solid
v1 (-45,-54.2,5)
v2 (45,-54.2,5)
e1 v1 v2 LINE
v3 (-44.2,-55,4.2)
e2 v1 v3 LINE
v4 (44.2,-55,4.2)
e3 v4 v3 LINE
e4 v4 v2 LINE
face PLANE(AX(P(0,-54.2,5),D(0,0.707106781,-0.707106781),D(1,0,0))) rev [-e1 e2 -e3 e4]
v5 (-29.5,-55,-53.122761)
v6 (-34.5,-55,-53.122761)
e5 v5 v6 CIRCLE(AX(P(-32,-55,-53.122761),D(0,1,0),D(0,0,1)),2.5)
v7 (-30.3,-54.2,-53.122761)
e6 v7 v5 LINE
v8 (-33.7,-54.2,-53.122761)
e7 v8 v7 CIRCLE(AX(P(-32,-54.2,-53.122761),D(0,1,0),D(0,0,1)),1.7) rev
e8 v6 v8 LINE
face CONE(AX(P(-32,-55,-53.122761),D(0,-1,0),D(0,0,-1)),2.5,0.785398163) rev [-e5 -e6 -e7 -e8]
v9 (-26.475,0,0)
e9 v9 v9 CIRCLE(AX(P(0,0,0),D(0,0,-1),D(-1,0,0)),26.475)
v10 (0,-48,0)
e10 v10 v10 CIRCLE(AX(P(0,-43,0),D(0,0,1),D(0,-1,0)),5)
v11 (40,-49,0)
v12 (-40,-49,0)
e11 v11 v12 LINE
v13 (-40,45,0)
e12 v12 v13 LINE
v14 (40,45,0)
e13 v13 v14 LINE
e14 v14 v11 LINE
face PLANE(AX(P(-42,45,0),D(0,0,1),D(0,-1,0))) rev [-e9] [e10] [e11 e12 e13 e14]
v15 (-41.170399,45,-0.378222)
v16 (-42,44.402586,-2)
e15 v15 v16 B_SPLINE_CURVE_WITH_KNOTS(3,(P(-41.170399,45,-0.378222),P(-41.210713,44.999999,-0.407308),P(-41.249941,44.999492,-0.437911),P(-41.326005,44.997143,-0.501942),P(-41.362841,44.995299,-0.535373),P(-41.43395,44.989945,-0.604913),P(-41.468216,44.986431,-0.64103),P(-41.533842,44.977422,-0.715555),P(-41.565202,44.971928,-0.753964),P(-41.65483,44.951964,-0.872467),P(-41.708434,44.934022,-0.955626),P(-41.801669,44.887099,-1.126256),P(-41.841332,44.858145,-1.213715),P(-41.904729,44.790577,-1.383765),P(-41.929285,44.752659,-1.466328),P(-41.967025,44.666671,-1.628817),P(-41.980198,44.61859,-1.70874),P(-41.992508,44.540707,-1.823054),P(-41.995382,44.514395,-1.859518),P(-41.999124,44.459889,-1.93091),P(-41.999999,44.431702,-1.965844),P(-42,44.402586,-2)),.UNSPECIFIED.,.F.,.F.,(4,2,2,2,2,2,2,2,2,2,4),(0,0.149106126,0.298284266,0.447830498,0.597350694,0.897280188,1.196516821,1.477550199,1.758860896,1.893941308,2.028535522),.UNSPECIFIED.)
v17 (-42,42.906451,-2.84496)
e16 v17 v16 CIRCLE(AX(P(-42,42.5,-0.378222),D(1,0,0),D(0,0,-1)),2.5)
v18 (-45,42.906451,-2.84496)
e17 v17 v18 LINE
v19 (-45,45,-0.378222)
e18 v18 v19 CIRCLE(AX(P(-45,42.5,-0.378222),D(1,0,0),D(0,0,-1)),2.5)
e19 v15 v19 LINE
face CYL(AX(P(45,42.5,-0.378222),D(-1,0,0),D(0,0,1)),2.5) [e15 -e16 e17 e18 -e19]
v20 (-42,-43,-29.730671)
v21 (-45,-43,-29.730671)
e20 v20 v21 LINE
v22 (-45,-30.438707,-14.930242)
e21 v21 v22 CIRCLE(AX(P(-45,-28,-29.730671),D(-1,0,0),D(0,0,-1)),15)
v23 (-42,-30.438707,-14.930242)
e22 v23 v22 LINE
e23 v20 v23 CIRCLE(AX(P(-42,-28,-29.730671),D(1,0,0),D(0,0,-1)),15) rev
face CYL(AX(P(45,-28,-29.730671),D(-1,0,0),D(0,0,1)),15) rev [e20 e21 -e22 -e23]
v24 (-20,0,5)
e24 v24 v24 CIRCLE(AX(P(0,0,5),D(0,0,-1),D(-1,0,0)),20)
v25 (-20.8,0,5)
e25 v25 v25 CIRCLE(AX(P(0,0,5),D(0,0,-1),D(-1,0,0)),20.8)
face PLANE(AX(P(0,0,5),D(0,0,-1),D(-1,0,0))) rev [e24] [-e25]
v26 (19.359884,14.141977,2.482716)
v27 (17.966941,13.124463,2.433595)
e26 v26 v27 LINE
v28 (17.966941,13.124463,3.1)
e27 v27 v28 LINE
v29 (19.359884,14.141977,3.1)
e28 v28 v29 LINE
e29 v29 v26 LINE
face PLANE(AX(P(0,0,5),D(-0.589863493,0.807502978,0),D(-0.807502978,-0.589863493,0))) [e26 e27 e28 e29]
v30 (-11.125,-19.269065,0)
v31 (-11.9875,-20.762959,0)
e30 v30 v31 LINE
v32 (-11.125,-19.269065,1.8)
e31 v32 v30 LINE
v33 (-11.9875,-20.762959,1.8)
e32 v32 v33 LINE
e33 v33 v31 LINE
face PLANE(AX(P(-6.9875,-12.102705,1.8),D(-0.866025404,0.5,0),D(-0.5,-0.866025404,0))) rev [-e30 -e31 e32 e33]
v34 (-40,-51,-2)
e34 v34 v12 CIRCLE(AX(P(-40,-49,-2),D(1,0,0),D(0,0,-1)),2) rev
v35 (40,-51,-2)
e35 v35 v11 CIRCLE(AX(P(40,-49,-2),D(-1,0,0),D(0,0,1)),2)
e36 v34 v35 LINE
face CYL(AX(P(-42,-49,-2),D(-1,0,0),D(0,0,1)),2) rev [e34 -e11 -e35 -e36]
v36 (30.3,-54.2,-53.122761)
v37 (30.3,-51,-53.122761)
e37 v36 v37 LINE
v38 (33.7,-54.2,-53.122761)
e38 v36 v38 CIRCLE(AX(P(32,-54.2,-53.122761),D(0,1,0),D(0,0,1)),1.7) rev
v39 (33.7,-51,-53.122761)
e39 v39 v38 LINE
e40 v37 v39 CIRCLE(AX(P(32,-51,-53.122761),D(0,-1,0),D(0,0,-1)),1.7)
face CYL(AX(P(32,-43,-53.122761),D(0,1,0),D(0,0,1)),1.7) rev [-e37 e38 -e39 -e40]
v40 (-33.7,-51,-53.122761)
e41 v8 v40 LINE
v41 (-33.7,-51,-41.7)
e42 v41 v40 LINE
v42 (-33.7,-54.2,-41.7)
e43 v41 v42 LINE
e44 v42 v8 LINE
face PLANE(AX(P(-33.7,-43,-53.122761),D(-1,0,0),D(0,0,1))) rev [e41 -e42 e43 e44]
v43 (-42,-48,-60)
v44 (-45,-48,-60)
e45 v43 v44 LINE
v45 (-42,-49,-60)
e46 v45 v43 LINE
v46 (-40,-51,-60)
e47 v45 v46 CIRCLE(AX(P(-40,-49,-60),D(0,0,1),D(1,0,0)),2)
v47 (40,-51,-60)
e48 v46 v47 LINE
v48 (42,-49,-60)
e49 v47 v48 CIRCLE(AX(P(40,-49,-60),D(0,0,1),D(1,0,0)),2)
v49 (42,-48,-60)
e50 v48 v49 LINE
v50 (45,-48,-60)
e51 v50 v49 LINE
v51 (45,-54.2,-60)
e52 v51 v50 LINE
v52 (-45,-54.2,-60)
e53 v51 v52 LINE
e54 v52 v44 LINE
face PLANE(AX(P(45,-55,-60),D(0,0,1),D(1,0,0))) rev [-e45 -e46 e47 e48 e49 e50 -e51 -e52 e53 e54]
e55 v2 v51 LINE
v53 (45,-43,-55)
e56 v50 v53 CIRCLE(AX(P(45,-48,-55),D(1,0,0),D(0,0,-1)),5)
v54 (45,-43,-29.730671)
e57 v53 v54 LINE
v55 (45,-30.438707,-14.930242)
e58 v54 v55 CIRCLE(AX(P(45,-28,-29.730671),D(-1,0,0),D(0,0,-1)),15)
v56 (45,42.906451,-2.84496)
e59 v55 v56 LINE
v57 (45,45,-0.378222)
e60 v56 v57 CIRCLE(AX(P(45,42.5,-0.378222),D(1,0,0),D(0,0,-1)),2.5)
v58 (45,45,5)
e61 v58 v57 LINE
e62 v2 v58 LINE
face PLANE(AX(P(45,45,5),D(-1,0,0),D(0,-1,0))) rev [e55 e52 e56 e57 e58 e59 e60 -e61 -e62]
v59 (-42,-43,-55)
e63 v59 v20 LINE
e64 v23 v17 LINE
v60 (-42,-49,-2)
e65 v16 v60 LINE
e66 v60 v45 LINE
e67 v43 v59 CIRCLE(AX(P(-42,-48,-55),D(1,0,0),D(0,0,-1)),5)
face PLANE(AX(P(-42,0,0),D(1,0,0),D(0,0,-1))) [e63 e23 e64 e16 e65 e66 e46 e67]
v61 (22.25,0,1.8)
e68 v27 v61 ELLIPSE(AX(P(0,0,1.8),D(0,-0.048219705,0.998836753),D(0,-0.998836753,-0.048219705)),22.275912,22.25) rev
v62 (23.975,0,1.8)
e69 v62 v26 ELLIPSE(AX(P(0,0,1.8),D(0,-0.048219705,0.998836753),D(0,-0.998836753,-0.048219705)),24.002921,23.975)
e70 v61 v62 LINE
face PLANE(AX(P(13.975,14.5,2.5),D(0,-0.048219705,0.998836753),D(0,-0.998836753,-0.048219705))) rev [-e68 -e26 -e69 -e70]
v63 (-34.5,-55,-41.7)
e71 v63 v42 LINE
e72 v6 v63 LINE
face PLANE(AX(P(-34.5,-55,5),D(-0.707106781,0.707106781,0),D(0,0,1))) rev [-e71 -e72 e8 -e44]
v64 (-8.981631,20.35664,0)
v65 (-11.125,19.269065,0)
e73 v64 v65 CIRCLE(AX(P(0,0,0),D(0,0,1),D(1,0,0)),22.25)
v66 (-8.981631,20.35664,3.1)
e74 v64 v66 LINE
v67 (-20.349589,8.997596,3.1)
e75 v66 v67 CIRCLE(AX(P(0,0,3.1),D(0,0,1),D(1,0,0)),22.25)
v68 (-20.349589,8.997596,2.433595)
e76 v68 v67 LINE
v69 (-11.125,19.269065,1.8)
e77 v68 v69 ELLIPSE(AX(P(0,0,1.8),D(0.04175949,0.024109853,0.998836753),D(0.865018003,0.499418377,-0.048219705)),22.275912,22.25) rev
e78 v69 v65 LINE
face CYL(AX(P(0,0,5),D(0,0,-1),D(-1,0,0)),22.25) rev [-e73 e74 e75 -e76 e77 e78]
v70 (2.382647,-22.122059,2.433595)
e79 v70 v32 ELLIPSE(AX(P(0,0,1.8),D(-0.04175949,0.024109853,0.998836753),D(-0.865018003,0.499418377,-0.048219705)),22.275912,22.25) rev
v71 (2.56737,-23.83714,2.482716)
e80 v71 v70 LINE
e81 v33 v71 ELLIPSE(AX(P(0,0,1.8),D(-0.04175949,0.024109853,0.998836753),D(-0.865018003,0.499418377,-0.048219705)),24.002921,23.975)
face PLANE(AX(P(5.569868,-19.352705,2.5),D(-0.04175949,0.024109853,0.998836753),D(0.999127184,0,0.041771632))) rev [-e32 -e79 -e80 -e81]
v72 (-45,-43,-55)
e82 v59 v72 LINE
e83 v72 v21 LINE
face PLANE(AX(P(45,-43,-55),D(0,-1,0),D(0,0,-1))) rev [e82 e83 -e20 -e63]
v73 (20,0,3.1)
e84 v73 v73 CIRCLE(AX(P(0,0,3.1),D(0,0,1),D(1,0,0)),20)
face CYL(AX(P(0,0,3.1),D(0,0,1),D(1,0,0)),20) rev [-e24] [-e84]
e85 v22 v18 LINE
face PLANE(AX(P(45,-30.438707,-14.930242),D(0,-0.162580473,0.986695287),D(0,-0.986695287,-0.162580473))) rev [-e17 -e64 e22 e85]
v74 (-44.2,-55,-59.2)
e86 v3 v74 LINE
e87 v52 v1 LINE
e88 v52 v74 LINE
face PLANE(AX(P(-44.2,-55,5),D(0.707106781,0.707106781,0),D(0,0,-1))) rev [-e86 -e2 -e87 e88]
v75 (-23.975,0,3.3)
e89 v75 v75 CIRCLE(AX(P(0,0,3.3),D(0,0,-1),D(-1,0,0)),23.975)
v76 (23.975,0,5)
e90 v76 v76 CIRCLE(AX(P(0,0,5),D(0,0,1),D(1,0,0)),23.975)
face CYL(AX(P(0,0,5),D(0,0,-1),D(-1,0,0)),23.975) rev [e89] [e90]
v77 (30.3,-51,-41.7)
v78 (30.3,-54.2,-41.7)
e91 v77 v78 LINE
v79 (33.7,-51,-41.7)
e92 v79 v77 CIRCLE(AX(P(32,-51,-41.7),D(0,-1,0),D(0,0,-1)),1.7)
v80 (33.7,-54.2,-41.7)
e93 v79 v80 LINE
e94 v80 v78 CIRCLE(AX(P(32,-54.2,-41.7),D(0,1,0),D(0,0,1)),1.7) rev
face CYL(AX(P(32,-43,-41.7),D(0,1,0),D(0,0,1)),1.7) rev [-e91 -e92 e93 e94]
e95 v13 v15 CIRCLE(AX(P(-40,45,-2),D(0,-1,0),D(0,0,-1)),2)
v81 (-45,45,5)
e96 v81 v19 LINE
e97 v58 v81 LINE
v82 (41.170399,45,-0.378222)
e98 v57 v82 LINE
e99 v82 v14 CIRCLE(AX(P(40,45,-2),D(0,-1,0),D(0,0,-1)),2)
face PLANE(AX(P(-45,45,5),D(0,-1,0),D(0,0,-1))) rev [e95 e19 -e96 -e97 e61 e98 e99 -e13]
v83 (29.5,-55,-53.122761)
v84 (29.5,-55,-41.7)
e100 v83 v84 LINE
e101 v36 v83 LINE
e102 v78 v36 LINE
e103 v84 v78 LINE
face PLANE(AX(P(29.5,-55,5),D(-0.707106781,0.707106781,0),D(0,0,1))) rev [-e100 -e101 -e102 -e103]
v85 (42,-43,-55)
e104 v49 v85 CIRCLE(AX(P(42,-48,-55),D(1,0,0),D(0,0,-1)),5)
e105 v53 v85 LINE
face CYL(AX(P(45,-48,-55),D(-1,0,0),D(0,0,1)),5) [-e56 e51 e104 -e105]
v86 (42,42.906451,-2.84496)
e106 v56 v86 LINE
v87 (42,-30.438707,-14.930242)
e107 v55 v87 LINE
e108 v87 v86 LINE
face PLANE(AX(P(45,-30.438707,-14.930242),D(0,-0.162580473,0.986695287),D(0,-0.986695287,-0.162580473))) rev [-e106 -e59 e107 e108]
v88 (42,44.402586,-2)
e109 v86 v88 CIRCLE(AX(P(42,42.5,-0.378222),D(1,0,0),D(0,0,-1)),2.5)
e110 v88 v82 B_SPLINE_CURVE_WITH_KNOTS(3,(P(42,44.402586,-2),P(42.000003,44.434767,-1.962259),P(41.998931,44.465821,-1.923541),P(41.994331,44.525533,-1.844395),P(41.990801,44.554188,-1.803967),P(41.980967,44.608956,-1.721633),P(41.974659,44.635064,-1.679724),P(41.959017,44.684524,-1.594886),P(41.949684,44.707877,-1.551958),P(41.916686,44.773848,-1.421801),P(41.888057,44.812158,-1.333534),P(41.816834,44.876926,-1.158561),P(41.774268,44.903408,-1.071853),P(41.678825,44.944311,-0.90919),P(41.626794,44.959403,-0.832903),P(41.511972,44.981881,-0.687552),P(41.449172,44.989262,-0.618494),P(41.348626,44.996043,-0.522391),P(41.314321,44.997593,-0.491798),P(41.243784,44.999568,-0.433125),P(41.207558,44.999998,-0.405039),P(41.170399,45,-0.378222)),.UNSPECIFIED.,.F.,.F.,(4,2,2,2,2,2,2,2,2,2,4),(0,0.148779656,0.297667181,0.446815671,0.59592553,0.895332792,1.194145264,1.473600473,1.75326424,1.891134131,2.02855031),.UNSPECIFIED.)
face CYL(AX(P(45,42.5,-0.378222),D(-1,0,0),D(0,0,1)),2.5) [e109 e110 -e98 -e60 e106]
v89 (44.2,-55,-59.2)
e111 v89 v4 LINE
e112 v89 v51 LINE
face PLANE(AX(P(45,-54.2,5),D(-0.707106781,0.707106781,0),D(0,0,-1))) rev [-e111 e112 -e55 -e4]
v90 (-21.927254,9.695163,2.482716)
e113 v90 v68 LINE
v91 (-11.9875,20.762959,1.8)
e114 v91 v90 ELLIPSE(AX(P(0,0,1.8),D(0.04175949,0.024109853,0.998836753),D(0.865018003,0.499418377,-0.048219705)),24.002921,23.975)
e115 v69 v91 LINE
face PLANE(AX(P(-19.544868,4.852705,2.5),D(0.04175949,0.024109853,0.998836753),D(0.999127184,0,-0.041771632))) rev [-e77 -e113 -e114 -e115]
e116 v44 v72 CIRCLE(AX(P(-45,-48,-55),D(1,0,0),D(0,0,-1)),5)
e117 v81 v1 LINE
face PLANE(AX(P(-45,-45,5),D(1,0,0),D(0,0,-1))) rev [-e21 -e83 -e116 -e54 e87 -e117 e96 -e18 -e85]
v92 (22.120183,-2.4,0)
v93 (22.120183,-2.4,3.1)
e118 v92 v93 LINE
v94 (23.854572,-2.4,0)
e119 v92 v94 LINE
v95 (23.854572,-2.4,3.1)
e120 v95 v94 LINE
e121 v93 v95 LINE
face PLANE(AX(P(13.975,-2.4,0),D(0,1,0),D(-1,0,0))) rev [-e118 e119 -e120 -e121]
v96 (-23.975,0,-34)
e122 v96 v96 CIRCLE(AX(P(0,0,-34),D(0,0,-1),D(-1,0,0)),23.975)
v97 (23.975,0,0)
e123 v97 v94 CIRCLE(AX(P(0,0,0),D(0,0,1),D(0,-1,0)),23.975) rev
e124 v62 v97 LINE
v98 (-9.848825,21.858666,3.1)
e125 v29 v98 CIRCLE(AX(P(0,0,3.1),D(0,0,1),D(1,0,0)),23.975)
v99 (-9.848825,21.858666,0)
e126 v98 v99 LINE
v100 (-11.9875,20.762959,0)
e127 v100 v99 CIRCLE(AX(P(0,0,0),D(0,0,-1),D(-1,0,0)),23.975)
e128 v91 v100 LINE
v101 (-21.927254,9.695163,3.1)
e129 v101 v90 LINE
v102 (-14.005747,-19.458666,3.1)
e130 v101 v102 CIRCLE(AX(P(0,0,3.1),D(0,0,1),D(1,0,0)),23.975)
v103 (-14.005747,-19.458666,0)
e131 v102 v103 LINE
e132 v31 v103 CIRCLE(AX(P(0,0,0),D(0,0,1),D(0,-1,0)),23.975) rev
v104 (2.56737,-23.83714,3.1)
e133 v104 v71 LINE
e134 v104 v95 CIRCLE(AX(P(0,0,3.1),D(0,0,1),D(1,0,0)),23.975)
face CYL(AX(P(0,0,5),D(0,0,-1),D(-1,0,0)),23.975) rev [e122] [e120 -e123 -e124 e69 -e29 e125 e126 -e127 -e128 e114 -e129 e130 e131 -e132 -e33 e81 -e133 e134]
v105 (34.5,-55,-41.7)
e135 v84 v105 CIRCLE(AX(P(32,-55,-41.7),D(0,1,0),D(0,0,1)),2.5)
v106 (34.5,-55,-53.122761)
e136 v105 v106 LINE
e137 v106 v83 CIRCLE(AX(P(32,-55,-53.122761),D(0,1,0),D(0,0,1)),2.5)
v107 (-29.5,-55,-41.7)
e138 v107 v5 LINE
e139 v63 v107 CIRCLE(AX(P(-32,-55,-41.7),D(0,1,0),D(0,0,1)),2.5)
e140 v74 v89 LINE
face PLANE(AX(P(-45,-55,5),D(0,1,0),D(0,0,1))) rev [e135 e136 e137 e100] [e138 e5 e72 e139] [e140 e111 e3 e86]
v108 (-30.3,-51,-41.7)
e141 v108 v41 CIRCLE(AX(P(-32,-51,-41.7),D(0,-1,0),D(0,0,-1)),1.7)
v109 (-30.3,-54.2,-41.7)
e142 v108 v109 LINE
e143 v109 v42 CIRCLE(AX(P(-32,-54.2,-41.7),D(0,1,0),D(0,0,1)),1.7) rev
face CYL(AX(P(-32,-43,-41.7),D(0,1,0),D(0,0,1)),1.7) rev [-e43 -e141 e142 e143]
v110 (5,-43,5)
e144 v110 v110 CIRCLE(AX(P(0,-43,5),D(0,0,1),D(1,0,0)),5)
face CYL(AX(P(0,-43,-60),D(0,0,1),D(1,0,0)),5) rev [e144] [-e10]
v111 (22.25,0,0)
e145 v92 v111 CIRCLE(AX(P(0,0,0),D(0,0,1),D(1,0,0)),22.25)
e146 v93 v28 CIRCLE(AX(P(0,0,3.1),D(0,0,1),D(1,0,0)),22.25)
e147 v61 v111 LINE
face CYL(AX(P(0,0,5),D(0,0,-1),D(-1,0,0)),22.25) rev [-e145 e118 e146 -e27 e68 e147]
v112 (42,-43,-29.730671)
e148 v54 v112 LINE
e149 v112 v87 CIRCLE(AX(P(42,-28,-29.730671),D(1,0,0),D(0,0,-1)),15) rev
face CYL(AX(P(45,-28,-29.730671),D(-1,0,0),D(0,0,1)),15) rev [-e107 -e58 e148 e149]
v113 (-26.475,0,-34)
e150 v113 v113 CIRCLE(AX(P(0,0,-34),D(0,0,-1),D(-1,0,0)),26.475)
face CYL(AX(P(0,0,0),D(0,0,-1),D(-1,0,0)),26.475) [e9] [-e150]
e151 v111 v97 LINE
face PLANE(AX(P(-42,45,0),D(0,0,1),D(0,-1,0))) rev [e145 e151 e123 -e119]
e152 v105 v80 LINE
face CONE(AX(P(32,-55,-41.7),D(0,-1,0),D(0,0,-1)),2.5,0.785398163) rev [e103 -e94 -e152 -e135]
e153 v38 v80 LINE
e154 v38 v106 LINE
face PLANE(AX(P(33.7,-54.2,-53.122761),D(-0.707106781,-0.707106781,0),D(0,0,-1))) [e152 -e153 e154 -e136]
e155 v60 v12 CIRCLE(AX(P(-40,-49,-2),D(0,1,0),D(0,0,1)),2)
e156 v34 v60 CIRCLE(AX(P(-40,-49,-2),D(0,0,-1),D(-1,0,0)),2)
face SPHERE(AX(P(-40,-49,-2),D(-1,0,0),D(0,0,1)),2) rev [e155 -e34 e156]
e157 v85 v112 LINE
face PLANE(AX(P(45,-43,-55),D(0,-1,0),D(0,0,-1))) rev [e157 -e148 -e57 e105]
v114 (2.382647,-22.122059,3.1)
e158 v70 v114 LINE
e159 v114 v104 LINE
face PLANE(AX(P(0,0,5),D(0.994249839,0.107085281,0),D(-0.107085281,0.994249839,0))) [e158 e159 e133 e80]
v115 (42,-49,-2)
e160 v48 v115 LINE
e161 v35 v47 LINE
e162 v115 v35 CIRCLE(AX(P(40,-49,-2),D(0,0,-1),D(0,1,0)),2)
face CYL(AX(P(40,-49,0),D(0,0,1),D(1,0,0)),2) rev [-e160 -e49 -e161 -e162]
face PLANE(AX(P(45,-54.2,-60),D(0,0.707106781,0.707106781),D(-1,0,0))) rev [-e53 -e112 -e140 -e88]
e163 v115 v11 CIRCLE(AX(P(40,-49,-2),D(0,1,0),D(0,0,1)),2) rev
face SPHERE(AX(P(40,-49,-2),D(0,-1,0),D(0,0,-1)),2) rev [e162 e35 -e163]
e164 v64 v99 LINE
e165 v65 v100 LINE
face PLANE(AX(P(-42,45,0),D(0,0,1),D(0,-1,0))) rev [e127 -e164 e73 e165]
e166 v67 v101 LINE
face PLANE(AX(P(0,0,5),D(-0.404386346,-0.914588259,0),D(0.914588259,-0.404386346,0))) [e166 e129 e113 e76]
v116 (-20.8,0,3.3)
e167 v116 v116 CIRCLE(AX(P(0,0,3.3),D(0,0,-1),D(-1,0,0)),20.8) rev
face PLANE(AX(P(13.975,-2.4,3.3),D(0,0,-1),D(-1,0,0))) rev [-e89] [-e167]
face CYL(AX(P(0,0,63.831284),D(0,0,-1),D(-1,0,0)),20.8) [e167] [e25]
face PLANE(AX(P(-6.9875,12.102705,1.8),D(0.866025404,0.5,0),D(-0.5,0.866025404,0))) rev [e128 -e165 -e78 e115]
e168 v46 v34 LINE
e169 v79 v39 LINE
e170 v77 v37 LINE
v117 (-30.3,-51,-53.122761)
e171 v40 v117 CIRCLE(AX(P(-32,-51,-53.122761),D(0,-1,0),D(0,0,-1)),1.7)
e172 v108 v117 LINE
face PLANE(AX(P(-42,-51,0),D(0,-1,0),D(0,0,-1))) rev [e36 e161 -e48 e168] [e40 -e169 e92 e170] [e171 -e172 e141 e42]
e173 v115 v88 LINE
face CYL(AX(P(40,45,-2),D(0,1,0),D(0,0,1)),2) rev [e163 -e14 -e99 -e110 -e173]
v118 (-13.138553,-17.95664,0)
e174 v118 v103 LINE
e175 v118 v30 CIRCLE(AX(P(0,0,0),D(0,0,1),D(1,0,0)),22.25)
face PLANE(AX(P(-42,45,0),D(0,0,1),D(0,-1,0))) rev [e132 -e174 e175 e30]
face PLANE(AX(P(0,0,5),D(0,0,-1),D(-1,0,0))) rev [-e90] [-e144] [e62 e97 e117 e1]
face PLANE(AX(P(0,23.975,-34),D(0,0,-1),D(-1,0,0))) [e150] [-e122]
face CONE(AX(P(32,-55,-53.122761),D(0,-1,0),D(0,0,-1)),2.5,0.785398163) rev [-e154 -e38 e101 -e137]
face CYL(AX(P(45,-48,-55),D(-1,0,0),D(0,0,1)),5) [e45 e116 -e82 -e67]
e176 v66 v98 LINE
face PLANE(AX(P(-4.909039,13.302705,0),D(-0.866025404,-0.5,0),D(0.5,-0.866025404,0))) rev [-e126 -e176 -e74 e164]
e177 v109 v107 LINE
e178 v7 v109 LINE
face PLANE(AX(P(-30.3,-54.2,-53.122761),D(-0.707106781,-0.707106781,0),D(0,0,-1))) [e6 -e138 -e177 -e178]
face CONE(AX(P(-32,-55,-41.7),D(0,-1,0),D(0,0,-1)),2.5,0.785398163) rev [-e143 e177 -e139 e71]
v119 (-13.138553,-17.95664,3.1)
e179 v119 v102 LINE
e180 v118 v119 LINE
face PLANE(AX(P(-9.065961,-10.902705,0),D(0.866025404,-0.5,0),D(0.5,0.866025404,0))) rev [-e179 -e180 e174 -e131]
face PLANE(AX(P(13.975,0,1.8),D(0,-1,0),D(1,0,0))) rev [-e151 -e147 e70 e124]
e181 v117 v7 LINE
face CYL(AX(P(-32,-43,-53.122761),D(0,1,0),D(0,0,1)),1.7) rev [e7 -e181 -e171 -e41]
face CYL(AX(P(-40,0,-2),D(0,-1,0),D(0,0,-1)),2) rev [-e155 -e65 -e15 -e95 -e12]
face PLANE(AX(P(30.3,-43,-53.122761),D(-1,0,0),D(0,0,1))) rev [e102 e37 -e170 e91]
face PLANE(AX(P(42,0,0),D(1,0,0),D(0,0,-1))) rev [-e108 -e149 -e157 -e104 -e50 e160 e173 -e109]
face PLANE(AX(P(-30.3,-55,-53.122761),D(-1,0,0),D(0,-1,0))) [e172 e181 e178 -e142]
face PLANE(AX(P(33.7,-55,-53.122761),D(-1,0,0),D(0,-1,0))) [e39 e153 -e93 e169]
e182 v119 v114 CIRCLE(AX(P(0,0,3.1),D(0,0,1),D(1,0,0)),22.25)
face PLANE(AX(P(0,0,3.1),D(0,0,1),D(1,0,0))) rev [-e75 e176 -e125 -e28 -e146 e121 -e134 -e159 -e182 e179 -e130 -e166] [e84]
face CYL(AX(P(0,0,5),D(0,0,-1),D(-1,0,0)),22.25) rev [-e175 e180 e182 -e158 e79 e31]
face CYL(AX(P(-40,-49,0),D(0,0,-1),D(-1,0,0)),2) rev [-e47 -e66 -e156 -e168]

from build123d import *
from build123d.topology import SkipClean

# Parameters (mm, degrees)
SKETCH1_R                = 23.975
BOSS_EXTRUDE1_DEPTH      = 5
BOSS_EXTRUDE6_DEPTH      = 45
CUT_EXTRUDE3_DEPTH       = 42
BOSS_EXTRUDE3_DEPTH      = 10
CUT_EXTRUDE2_DEPTH       = 94.005376189
CIRPATTERN1_COUNT        = 3
SKETCH3_R                = 22.25
CUT_EXTRUDE1_DEPTH       = 94.005376189
BOSS_EXTRUDE4_START      = -0.2
SKETCH5_R                = 23.975
SKETCH5_R_2              = 20
BOSS_EXTRUDE4_DEPTH      = 0.2
SKETCH6_R                = 20.8
SKETCH6_R_2              = 20
BOSS_EXTRUDE5_DEPTH      = 1.7
SKETCH8_W                = 34
SKETCH8_H                = 2.5
M3_START                 = -55
M3_CLEARANCE_SLOT3_DEPTH = 4
SKETCH14_R               = 5
CUT_EXTRUDE4_DEPTH       = 97.306801421
FILLET3_R                = 2
CHAMFER1_SIZE            = 0.8


# Read off the part's stored shape, not the designer's step: M3 Clearance Slot3
with BuildPart() as part:
    # Sketch1 → Boss-Extrude1 (new body)
    with BuildSketch(Plane.XY):
        Polygon((-45, -45), (-45, -55), (45, -55), (45, -45), (45, 45), (-45, 45), align=None)
        Circle(SKETCH1_R, mode=Mode.SUBTRACT)
    extrude(amount=BOSS_EXTRUDE1_DEPTH)

    # Sketch9 → Boss-Extrude6 (add, symmetric)
    with BuildSketch(Plane(origin=(0, 0, 0), x_dir=(0, 0, -1), z_dir=(1, 0, 0))):
        with BuildLine():
            Line((0, 45), (0, -55))
            Line((0, -55), (60, -55))
            Line((60, -55), (60, -48))
            ThreePointArc((60, -48), (58.535533906, -44.464466094), (55, -43))
            Line((55, -43), (29.730670818, -43))
            ThreePointArc((29.730670818, -43), (20.024502844, -39.436358829), (14.930241511, -30.438707102))
            Line((14.930241511, -30.438707102), (2.844959748, 42.906451184))
            ThreePointArc((2.844959748, 42.906451184), (1.995916193, 44.406059805), (0.37822153, 45))
            Line((0.37822153, 45), (0, 45))
        make_face()
    extrude(amount=BOSS_EXTRUDE6_DEPTH, both=True)

    # Sketch10 → Cut-Extrude3 (cut, symmetric)
    with BuildSketch(Plane(origin=(0, 0, 0), x_dir=(0, 0, -1), z_dir=(1, 0, 0))):
        Polygon((0, 45), (0, -51), (62.788214541, -51), (2.5, 45), align=None)
    extrude(amount=CUT_EXTRUDE3_DEPTH, both=True, mode=Mode.SUBTRACT)

    # Sketch2 → Boss-Extrude3 (add)
    with BuildSketch(Plane.ZY.offset(-23.975)):
        Polygon((0, -2.4), (3.3, -2.4), (3.3, 14.5), (2.5, 14.5), (1.8, 0), (0, 0), align=None)
    boss_extrude3 = extrude(amount=BOSS_EXTRUDE3_DEPTH)

    # Sketch4 → Cut-Extrude2 (cut, through all)
    with BuildSketch(Plane.XY):
        with BuildLine():
            Line((16.63749335, 17.262515461), (0, 0))
            Line((0, 0), (19.359883897, 14.141977248))
            ThreePointArc((19.359883897, 14.141977248), (18.066190297, 15.761135529), (16.63749335, 17.262515461))
        make_face()
    cut_extrude2 = extrude(amount=CUT_EXTRUDE2_DEPTH, mode=Mode.SUBTRACT)

    # CirPattern1: Boss-Extrude3, Cut-Extrude2 ×3 about axis
    cirpattern1_axis = Axis((0, 0, 0), (0, 0, 1))
    add([boss_extrude3.rotate(cirpattern1_axis, i * 360 / CIRPATTERN1_COUNT) for i in range(1, CIRPATTERN1_COUNT)])
    add([cut_extrude2.rotate(cirpattern1_axis, i * 360 / CIRPATTERN1_COUNT) for i in range(1, CIRPATTERN1_COUNT)], mode=Mode.SUBTRACT)

    # Sketch3 → Cut-Extrude1 (cut, through all)
    with BuildSketch(Plane.XY):
        Circle(SKETCH3_R)
    extrude(amount=CUT_EXTRUDE1_DEPTH, mode=Mode.SUBTRACT)

    # Sketch5 → Boss-Extrude4 (add)
    with BuildSketch(Plane.XY.offset(3.3).offset(BOSS_EXTRUDE4_START)):
        with Locations(Location((0, 0, 0), (0, 0, 180))):
            Circle(SKETCH5_R)
        Circle(SKETCH5_R_2, mode=Mode.SUBTRACT)
    extrude(amount=BOSS_EXTRUDE4_DEPTH)

    # Sketch6 → Boss-Extrude5 (add)
    with BuildSketch(Plane.XY.offset(3.3)):
        with Locations(Location((0, 0, 0), (0, 0, 180))):
            Circle(SKETCH6_R)
        Circle(SKETCH6_R_2, mode=Mode.SUBTRACT)
    extrude(amount=BOSS_EXTRUDE5_DEPTH)

    # Sketch8 → Revolve1 (revolve)
    with SkipClean():  # the faces are left unmerged after this step: merging them gives an invalid solid
        with BuildSketch(Plane(origin=(0, 0, 0), x_dir=(0, 0, -1), z_dir=(1, 0, 0)), mode=Mode.PRIVATE) as revolve1_sk:
            with Locations((17, 25.225)):
                Rectangle(SKETCH8_W, SKETCH8_H)
        revolve(revolve1_sk.sketch.rotate(Axis((0, 0, 0), (0, 0, 1)), 90), axis=Axis((0, 0, 0), (0, 0, 1)))

    # M3 Clearance Slot3 outline → M3 Clearance Slot3 (cut)
    with SkipClean():  # the faces are left unmerged after this step: merging them gives an invalid solid
        with BuildSketch(Plane(origin=(0, 0, 0), x_dir=(1, 0, 0), z_dir=(0, 1, 0)).offset(M3_START)):
            with BuildLine():
                Line((33.7, 41.7), (33.7, 53.122760777))
                ThreePointArc((33.7, 53.122760777), (32, 54.822760777), (30.3, 53.122760777))
                Line((30.3, 53.122760777), (30.3, 41.7))
                ThreePointArc((30.3, 41.7), (32, 40), (33.7, 41.7))
            make_face()
            with BuildLine():
                Line((-30.3, 41.7), (-30.3, 53.122760777))
                ThreePointArc((-30.3, 53.122760777), (-32, 54.822760777), (-33.7, 53.122760777))
                Line((-33.7, 53.122760777), (-33.7, 41.7))
                ThreePointArc((-33.7, 41.7), (-32, 40), (-30.3, 41.7))
            make_face()
        extrude(amount=M3_CLEARANCE_SLOT3_DEPTH, mode=Mode.SUBTRACT)

    # Sketch14 → Cut-Extrude4 (cut, through all)
    with SkipClean():  # the faces are left unmerged after this step: merging them gives an invalid solid
        with BuildSketch(Plane.XY.offset(5)):
            with Locations((0, -43)):
                Circle(SKETCH14_R)
        extrude(amount=-CUT_EXTRUDE4_DEPTH, mode=Mode.SUBTRACT)

    # Fillet3
    fillet3_edges = [part.edges().sort_by_distance(p)[0] for p in [
        (42, -3, 0),
        (0, -51, 0),
        (-42, -3, 0),
        (42, -51, -30),
        (-42, -51, -30),
    ]]
    fillet(fillet3_edges, radius=FILLET3_R)

    # Chamfer1
    chamfer1_edges = [part.edges().sort_by_distance(p)[0] for p in [
        (45, -55, -27.5),
        (-45, -55, -27.5),
        (0, -55, 5),
        (0, -55, -60),
        (32, -55, -54.822760777),
        (32, -55, -40),
        (30.3, -55, -47.411380389),
        (33.7, -55, -47.411380389),
        (-33.7, -55, -47.411380389),
        (-32, -55, -54.822760777),
        (-32, -55, -40),
        (-30.3, -55, -47.411380389),
    ]]
    chamfer(chamfer1_edges, length=CHAMFER1_SIZE)


solid = part.part
